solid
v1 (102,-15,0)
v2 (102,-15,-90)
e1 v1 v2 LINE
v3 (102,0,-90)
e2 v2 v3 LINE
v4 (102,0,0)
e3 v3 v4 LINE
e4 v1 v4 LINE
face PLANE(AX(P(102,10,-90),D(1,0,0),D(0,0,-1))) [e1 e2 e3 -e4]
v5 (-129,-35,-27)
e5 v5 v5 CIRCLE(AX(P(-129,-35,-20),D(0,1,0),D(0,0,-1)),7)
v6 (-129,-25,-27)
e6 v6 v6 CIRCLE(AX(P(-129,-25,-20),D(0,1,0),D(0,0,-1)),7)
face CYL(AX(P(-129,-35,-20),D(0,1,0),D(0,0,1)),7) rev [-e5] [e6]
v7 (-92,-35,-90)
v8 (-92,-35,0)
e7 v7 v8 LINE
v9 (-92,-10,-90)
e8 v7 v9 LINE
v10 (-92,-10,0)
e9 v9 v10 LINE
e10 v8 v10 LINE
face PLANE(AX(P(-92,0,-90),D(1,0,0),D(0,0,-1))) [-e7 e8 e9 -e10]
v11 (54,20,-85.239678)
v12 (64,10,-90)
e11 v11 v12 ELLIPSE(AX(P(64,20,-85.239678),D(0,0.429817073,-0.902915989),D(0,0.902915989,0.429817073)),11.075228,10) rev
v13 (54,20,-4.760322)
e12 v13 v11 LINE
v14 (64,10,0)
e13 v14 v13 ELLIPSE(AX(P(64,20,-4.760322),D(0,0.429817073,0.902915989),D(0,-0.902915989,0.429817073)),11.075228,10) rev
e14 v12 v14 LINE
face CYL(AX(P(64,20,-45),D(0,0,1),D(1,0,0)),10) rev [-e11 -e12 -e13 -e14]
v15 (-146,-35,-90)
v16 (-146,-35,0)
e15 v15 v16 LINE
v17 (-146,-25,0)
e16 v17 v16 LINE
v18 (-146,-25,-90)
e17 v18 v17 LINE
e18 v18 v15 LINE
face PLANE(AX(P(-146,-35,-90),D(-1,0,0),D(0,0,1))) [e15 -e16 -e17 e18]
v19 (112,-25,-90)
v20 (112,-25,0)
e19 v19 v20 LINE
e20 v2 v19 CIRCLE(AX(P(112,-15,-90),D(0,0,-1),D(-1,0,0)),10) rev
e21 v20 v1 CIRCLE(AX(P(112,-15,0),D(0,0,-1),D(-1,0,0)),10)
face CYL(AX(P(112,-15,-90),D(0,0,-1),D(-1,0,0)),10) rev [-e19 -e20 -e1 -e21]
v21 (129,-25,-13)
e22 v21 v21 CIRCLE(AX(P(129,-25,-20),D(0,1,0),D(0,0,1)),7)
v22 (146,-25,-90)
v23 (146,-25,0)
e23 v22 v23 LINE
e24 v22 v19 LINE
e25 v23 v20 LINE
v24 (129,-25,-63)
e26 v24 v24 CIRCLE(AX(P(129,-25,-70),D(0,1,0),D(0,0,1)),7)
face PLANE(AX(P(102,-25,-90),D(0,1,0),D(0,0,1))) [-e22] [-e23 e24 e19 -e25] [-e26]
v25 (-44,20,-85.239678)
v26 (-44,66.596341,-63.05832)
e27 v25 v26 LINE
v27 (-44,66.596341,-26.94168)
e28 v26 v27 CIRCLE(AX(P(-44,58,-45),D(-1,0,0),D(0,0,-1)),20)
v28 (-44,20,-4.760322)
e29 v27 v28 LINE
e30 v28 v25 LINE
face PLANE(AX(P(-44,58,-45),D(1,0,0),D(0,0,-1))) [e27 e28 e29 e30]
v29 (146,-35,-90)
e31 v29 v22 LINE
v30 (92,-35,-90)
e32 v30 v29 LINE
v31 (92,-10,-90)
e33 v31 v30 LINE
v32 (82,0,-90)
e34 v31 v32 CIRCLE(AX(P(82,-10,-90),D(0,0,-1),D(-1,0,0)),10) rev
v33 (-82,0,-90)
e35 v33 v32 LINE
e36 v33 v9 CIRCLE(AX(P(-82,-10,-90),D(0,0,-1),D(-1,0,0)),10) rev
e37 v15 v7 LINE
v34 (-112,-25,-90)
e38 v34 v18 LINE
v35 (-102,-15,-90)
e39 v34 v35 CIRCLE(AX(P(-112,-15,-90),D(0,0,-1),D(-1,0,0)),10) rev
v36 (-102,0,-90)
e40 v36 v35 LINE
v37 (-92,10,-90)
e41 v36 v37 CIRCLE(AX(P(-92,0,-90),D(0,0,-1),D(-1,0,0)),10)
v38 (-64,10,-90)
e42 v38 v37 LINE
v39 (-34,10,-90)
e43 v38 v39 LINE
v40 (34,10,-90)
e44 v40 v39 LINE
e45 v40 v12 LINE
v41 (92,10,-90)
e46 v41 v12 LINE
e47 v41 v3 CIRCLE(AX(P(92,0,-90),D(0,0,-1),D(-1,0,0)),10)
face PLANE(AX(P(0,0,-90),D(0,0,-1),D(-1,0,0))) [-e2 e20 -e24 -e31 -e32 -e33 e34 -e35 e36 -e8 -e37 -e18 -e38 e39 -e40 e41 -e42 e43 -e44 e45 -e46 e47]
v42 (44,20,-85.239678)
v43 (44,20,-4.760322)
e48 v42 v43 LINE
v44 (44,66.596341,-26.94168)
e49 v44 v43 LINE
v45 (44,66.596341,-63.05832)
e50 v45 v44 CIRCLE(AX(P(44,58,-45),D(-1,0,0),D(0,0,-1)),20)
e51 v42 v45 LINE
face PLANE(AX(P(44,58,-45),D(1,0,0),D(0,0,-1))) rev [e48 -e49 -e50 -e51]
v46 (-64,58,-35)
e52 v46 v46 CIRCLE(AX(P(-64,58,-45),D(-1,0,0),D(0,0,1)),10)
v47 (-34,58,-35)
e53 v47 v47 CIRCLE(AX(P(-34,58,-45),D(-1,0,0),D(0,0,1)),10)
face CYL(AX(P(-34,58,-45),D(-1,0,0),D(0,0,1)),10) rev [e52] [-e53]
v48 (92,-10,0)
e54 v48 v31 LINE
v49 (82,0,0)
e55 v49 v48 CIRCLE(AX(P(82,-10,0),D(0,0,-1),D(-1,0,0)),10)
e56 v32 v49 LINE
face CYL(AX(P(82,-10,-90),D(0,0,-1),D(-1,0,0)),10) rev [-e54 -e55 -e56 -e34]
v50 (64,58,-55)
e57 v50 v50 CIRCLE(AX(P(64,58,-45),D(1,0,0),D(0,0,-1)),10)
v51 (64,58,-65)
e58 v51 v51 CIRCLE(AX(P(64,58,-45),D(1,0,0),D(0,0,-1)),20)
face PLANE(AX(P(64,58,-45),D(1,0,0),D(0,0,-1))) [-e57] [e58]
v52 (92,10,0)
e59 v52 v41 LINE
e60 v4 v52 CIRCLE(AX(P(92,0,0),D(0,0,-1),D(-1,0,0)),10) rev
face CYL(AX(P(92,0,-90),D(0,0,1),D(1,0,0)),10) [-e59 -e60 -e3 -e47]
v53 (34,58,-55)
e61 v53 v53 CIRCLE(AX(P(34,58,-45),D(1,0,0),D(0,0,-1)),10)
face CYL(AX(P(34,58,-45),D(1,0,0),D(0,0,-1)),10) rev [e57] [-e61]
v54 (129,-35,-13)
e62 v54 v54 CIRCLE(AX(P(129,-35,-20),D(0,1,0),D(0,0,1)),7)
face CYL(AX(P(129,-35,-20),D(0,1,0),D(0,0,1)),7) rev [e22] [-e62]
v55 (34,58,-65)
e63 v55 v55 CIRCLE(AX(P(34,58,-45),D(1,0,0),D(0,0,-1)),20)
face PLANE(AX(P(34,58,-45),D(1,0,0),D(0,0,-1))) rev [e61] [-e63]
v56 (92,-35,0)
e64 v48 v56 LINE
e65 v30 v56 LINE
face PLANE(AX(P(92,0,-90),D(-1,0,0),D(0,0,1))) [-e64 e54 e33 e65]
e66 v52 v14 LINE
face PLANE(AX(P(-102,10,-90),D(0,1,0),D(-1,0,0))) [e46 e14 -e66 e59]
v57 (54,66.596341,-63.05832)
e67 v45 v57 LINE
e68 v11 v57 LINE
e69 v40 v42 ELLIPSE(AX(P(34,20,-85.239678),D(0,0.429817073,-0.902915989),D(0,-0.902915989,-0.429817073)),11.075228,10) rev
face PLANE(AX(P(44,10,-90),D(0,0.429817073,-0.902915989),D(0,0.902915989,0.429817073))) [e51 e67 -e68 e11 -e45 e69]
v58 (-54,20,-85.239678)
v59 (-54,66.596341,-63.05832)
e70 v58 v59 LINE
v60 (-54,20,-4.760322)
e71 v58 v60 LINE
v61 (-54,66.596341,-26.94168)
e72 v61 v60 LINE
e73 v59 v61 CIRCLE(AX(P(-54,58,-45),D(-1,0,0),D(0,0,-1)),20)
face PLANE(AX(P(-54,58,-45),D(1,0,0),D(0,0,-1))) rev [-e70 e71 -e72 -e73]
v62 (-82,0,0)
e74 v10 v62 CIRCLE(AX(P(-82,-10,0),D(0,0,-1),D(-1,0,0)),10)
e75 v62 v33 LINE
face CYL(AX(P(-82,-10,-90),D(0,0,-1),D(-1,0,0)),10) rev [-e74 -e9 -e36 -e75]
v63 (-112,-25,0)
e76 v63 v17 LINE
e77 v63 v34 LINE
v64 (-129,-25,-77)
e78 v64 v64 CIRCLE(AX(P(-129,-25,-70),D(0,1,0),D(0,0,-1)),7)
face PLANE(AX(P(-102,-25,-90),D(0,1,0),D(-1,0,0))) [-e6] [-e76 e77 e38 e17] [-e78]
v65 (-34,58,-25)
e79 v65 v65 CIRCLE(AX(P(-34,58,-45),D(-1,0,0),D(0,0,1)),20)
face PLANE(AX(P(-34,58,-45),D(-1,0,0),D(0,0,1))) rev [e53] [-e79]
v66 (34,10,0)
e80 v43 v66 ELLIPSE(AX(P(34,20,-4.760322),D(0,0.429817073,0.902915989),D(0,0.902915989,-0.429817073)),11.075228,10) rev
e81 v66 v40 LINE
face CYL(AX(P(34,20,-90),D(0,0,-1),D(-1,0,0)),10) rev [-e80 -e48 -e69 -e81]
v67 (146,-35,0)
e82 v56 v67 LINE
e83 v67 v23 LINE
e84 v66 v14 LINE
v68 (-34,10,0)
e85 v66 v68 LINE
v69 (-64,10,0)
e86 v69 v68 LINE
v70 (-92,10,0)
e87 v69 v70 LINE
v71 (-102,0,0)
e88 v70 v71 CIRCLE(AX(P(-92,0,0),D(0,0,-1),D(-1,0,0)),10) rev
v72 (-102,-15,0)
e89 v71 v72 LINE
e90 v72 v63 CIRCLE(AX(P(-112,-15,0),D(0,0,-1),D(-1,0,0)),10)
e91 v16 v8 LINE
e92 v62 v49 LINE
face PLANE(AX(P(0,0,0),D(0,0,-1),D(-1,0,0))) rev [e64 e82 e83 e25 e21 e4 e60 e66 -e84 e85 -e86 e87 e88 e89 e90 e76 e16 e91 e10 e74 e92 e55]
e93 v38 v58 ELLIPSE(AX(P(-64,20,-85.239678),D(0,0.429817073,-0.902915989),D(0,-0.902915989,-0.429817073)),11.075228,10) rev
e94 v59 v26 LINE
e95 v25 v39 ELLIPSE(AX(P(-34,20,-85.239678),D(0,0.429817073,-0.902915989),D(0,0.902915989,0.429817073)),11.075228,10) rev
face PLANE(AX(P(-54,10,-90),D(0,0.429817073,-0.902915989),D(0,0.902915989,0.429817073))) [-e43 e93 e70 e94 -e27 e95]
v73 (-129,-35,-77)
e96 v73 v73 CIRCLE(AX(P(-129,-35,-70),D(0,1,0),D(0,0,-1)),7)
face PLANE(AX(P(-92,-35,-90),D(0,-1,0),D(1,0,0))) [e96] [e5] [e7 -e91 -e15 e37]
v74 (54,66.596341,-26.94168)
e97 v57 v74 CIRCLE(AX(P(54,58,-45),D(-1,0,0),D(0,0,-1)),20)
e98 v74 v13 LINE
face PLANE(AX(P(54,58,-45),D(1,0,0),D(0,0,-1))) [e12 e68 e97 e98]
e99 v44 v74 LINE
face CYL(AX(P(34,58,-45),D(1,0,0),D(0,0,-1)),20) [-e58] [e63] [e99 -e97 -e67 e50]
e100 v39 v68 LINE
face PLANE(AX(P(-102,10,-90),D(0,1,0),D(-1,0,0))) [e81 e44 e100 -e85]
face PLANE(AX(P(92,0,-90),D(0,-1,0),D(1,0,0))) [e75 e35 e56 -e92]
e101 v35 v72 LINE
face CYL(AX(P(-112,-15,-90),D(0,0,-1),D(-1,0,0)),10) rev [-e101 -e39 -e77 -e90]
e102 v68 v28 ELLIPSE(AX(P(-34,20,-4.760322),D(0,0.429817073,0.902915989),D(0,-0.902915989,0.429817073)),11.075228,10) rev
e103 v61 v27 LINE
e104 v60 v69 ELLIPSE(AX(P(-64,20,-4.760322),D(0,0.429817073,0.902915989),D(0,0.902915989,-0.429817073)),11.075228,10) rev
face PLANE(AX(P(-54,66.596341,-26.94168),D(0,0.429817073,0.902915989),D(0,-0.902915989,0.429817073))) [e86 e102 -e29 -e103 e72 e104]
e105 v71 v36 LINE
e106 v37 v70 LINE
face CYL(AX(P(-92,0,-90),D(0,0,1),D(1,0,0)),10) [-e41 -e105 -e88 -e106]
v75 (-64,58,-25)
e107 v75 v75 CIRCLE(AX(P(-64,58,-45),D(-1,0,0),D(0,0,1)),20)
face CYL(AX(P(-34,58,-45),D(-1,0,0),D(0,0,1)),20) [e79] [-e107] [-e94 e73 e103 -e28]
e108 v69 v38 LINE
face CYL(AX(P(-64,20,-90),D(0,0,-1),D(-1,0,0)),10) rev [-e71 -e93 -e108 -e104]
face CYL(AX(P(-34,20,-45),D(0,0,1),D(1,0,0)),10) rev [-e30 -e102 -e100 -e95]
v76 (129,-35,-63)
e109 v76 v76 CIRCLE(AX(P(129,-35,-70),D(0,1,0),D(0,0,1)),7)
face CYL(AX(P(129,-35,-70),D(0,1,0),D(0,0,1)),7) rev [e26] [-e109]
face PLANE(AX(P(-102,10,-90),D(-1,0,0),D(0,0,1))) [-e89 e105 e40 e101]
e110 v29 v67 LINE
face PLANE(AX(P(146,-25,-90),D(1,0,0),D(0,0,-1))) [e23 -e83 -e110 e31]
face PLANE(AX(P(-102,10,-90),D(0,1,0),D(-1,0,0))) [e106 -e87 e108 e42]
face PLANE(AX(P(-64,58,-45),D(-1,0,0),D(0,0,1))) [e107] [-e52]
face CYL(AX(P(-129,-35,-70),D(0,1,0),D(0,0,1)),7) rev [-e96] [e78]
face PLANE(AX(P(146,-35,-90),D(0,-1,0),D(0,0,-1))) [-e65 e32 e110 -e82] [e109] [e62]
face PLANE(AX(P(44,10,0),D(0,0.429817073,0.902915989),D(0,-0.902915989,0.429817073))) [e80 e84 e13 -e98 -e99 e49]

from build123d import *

# Parameters (mm, degrees)
BOSS_EXTRUDE1_DEPTH      = 90
FILLET1_R                = 10
SKETCH2_R                = 7
CUT_EXTRUDE1_DEPTH       = 10
SKETCH10_R               = 20
SKETCH10_R_2             = 10
BOSS_EXTRUDE5_DEPTH      = 68
SKETCH11_R               = 20
SKETCH11_R_2             = 10
CUT_EXTRUDE5_DEPTH       = 38
BOSS_EXTRUDE6_DEPTH      = 5
BOSS_EXTRUDE6_DEPTH_BACK = 5
FILLET3_R                = 10
SKETCH15_R               = 20
SKETCH15_R_2             = 10
BOSS_EXTRUDE7_DEPTH      = 68
CUT_EXTRUDE6_START       = -38
SKETCH16_R               = 20
SKETCH16_R_2             = 10
CUT_EXTRUDE6_DEPTH       = 38
BOSS_EXTRUDE8_DEPTH      = 5
BOSS_EXTRUDE8_DEPTH_BACK = 5
FILLET4_R                = 10


with BuildPart() as part:
    # Sketch1 → Boss-Extrude1 (new body)
    with BuildSketch(Plane.XY):
        Polygon((-102, 10), (102, 10), (102, -25), (146, -25), (146, -35), (92, -35), (92, 0), (-92, 0), (-92, -35), (-146, -35), (-146, -25), (-102, -25), align=None)
    extrude(amount=-BOSS_EXTRUDE1_DEPTH)

    # Fillet1
    fillet1_edges = [part.edges().sort_by_distance(p)[0] for p in [
        (-102, -25, -45),
        (-102, 10, -45),
        (102, 10, -45),
        (102, -25, -45),
    ]]
    fillet(fillet1_edges, radius=FILLET1_R)

    # Sketch2 → Cut-Extrude1 (cut)
    with BuildSketch(Plane(origin=(0, -25, 0), x_dir=(1, 0, 0), z_dir=(0, 1, 0))):
        with Locations(Location((129, 20, 0), (0, 0, 270))):
            Circle(SKETCH2_R)
        with Locations(Location((129, 70, 0), (0, 0, 270))):
            Circle(SKETCH2_R)
        with Locations(Location((-129, 70, 0), (0, 0, 90))):
            Circle(SKETCH2_R)
        with Locations(Location((-129, 20, 0), (0, 0, 90))):
            Circle(SKETCH2_R)
    extrude(amount=-CUT_EXTRUDE1_DEPTH, mode=Mode.SUBTRACT)



with BuildPart() as body_2:
    # Sketch10 → Boss-Extrude5 (new body)
    with BuildSketch(Plane.ZY.offset(102)):
        with Locations((-45, 48)):
            Circle(SKETCH10_R)
        with Locations((-45, 48)):
            Circle(SKETCH10_R_2, mode=Mode.SUBTRACT)
    extrude(amount=-BOSS_EXTRUDE5_DEPTH)

    # Sketch11 → Cut-Extrude5 (cut)
    with BuildSketch(Plane.ZY.offset(102)):
        with Locations((-45, 48)):
            Circle(SKETCH11_R)
        with Locations((-45, 48)):
            Circle(SKETCH11_R_2, mode=Mode.SUBTRACT)
    extrude(amount=-CUT_EXTRUDE5_DEPTH, mode=Mode.SUBTRACT)


with BuildPart() as body_2_1:
    # Body-Move/Copy1: moved
    add(body_2.part.moved(Location((0, 10, 0))))


with BuildPart() as part_1:
    add(part.part)

    add(body_2_1.part)  # Boss-Extrude6 merges body 2
    # Sketch14 → Boss-Extrude6 (add, two sides: drawn at the far end of the back side and taken through both)
    with BuildSketch(Plane(origin=(-49, 0, 0), x_dir=(0, 0, -1), z_dir=(1, 0, 0)).offset(-BOSS_EXTRUDE6_DEPTH_BACK)):
        with BuildLine():
            Line((45, 10), (0, 10))
            Line((0, 10), (26.941680216, 66.596341464))
            ThreePointArc((26.941680216, 66.596341464), (45, 38), (63.058319784, 66.596341464))
            Line((63.058319784, 66.596341464), (90, 10))
            Line((90, 10), (45, 10))
        make_face()
    extrude(amount=BOSS_EXTRUDE6_DEPTH + BOSS_EXTRUDE6_DEPTH_BACK)

    # Fillet3
    # the kernel refuses this fillet: 10 mm, written as the material it adds along each edge
    with BuildSketch(Plane(origin=(-54, 10, 0), x_dir=(-1, 0, 0), z_dir=(0, 0, -1))) as fillet3_piece_1_section:
        with BuildLine():
            CenterArc((FILLET3_R, FILLET3_R), FILLET3_R, 180, 90)
            Line((0, FILLET3_R), (0, 0))
            Line((0, 0), (FILLET3_R, 0))
        make_face()
    fillet3_piece_1 = extrude(amount=90, mode=Mode.PRIVATE)
    fillet3_piece_1 = split(fillet3_piece_1, bisect_by=Plane(origin=(-56.293482883, 29.268794576, -9.172566427), z_dir=(0, -0.4298170732175253, -0.9029159892098049)), keep=Keep.TOP, mode=Mode.PRIVATE)
    fillet3_piece_1 = split(fillet3_piece_1, bisect_by=Plane(origin=(-56.293482883, 29.268794576, -80.827433573), z_dir=(0, -0.4298170732175253, 0.9029159892098049)), keep=Keep.TOP, mode=Mode.PRIVATE)
    add(fillet3_piece_1)
    with BuildSketch(Plane(origin=(-44, 10, -90), x_dir=(1, 0, 0), z_dir=(0, 0, 1))) as fillet3_piece_2_section:
        with BuildLine():
            CenterArc((FILLET3_R, FILLET3_R), FILLET3_R, 180, 90)
            Line((0, FILLET3_R), (0, 0))
            Line((0, 0), (FILLET3_R, 0))
        make_face()
    fillet3_piece_2 = extrude(amount=90, mode=Mode.PRIVATE)
    fillet3_piece_2 = split(fillet3_piece_2, bisect_by=Plane(origin=(-41.706517117, 29.268794576, -9.172566427), z_dir=(0, -0.4298170732175253, -0.9029159892098049)), keep=Keep.TOP, mode=Mode.PRIVATE)
    fillet3_piece_2 = split(fillet3_piece_2, bisect_by=Plane(origin=(-41.706517117, 29.268794576, -80.827433573), z_dir=(0, -0.4298170732175253, 0.9029159892098049)), keep=Keep.TOP, mode=Mode.PRIVATE)
    add(fillet3_piece_2)



with BuildPart() as body_2_2:
    # Sketch15 → Boss-Extrude7 (new body)
    with BuildSketch(Plane(origin=(102, 0, 0), x_dir=(0, 0, -1), z_dir=(1, 0, 0))):
        with Locations(Location((45, 58, 0), (0, 0, 180))):
            Circle(SKETCH15_R)
        with Locations(Location((45, 58, 0), (0, 0, 180))):
            Circle(SKETCH15_R_2, mode=Mode.SUBTRACT)
    extrude(amount=-BOSS_EXTRUDE7_DEPTH)

    # Sketch16 → Cut-Extrude6 (cut)
    with BuildSketch(Plane(origin=(102, 0, 0), x_dir=(0, 0, -1), z_dir=(1, 0, 0)).offset(CUT_EXTRUDE6_START)):
        with Locations(Location((45, 58, 0), (0, 0, 180))):
            Circle(SKETCH16_R)
        with Locations(Location((45, 58, 0), (0, 0, 180))):
            Circle(SKETCH16_R_2, mode=Mode.SUBTRACT)
    extrude(amount=CUT_EXTRUDE6_DEPTH, mode=Mode.SUBTRACT)


with BuildPart() as part_2:
    add(part_1.part)

    add(body_2_2.part)  # Boss-Extrude8 merges body 2 2
    # Sketch17 → Boss-Extrude8 (add, two sides: drawn at the far end of the back side and taken through both)
    with BuildSketch(Plane(origin=(49, 0, 0), x_dir=(0, 0, -1), z_dir=(1, 0, 0)).offset(-BOSS_EXTRUDE8_DEPTH_BACK)):
        with BuildLine():
            Line((45, 10), (0, 10))
            Line((0, 10), (26.941680216, 66.596341464))
            ThreePointArc((26.941680216, 66.596341464), (45, 38), (63.058319784, 66.596341464))
            Line((63.058319784, 66.596341464), (90, 10))
            Line((90, 10), (45, 10))
        make_face()
    extrude(amount=BOSS_EXTRUDE8_DEPTH + BOSS_EXTRUDE8_DEPTH_BACK)

    # Fillet4
    # the kernel refuses this fillet: 10 mm, written as the material it adds along each edge
    with BuildSketch(Plane(origin=(44, 10, 0), x_dir=(-1, 0, 0), z_dir=(0, 0, -1))) as fillet4_piece_1_section:
        with BuildLine():
            CenterArc((FILLET4_R, FILLET4_R), FILLET4_R, 180, 90)
            Line((0, FILLET4_R), (0, 0))
            Line((0, 0), (FILLET4_R, 0))
        make_face()
    fillet4_piece_1 = extrude(amount=90, mode=Mode.PRIVATE)
    fillet4_piece_1 = split(fillet4_piece_1, bisect_by=Plane(origin=(41.706517117, 29.268794576, -80.827433573), z_dir=(0, -0.4298170732175253, 0.9029159892098049)), keep=Keep.TOP, mode=Mode.PRIVATE)
    fillet4_piece_1 = split(fillet4_piece_1, bisect_by=Plane(origin=(41.706517117, 29.268794576, -9.172566427), z_dir=(0, -0.4298170732175254, -0.9029159892098049)), keep=Keep.TOP, mode=Mode.PRIVATE)
    add(fillet4_piece_1)
    with BuildSketch(Plane(origin=(54, 10, -90), x_dir=(1, 0, 0), z_dir=(0, 0, 1))) as fillet4_piece_2_section:
        with BuildLine():
            CenterArc((FILLET4_R, FILLET4_R), FILLET4_R, 180, 90)
            Line((0, FILLET4_R), (0, 0))
            Line((0, 0), (FILLET4_R, 0))
        make_face()
    fillet4_piece_2 = extrude(amount=90, mode=Mode.PRIVATE)
    fillet4_piece_2 = split(fillet4_piece_2, bisect_by=Plane(origin=(56.293482883, 29.268794576, -9.172566427), z_dir=(0, -0.4298170732175254, -0.9029159892098049)), keep=Keep.TOP, mode=Mode.PRIVATE)
    fillet4_piece_2 = split(fillet4_piece_2, bisect_by=Plane(origin=(56.293482883, 29.268794576, -80.827433573), z_dir=(0, -0.4298170732175253, 0.9029159892098049)), keep=Keep.TOP, mode=Mode.PRIVATE)
    add(fillet4_piece_2)
    with BuildSketch(Plane(origin=(92, 0, 0), x_dir=(0, -1, 0), z_dir=(0, 0, -1)), Plane(origin=(-92, 0, 0), x_dir=(1, 0, 0), z_dir=(0, 0, -1))) as fillet4_piece_3:
        with BuildLine():
            CenterArc((FILLET4_R, FILLET4_R), FILLET4_R, 180, 90)
            Line((0, FILLET4_R), (0, 0))
            Line((0, 0), (FILLET4_R, 0))
        make_face()
    extrude(amount=90)


solid = part_2.part
